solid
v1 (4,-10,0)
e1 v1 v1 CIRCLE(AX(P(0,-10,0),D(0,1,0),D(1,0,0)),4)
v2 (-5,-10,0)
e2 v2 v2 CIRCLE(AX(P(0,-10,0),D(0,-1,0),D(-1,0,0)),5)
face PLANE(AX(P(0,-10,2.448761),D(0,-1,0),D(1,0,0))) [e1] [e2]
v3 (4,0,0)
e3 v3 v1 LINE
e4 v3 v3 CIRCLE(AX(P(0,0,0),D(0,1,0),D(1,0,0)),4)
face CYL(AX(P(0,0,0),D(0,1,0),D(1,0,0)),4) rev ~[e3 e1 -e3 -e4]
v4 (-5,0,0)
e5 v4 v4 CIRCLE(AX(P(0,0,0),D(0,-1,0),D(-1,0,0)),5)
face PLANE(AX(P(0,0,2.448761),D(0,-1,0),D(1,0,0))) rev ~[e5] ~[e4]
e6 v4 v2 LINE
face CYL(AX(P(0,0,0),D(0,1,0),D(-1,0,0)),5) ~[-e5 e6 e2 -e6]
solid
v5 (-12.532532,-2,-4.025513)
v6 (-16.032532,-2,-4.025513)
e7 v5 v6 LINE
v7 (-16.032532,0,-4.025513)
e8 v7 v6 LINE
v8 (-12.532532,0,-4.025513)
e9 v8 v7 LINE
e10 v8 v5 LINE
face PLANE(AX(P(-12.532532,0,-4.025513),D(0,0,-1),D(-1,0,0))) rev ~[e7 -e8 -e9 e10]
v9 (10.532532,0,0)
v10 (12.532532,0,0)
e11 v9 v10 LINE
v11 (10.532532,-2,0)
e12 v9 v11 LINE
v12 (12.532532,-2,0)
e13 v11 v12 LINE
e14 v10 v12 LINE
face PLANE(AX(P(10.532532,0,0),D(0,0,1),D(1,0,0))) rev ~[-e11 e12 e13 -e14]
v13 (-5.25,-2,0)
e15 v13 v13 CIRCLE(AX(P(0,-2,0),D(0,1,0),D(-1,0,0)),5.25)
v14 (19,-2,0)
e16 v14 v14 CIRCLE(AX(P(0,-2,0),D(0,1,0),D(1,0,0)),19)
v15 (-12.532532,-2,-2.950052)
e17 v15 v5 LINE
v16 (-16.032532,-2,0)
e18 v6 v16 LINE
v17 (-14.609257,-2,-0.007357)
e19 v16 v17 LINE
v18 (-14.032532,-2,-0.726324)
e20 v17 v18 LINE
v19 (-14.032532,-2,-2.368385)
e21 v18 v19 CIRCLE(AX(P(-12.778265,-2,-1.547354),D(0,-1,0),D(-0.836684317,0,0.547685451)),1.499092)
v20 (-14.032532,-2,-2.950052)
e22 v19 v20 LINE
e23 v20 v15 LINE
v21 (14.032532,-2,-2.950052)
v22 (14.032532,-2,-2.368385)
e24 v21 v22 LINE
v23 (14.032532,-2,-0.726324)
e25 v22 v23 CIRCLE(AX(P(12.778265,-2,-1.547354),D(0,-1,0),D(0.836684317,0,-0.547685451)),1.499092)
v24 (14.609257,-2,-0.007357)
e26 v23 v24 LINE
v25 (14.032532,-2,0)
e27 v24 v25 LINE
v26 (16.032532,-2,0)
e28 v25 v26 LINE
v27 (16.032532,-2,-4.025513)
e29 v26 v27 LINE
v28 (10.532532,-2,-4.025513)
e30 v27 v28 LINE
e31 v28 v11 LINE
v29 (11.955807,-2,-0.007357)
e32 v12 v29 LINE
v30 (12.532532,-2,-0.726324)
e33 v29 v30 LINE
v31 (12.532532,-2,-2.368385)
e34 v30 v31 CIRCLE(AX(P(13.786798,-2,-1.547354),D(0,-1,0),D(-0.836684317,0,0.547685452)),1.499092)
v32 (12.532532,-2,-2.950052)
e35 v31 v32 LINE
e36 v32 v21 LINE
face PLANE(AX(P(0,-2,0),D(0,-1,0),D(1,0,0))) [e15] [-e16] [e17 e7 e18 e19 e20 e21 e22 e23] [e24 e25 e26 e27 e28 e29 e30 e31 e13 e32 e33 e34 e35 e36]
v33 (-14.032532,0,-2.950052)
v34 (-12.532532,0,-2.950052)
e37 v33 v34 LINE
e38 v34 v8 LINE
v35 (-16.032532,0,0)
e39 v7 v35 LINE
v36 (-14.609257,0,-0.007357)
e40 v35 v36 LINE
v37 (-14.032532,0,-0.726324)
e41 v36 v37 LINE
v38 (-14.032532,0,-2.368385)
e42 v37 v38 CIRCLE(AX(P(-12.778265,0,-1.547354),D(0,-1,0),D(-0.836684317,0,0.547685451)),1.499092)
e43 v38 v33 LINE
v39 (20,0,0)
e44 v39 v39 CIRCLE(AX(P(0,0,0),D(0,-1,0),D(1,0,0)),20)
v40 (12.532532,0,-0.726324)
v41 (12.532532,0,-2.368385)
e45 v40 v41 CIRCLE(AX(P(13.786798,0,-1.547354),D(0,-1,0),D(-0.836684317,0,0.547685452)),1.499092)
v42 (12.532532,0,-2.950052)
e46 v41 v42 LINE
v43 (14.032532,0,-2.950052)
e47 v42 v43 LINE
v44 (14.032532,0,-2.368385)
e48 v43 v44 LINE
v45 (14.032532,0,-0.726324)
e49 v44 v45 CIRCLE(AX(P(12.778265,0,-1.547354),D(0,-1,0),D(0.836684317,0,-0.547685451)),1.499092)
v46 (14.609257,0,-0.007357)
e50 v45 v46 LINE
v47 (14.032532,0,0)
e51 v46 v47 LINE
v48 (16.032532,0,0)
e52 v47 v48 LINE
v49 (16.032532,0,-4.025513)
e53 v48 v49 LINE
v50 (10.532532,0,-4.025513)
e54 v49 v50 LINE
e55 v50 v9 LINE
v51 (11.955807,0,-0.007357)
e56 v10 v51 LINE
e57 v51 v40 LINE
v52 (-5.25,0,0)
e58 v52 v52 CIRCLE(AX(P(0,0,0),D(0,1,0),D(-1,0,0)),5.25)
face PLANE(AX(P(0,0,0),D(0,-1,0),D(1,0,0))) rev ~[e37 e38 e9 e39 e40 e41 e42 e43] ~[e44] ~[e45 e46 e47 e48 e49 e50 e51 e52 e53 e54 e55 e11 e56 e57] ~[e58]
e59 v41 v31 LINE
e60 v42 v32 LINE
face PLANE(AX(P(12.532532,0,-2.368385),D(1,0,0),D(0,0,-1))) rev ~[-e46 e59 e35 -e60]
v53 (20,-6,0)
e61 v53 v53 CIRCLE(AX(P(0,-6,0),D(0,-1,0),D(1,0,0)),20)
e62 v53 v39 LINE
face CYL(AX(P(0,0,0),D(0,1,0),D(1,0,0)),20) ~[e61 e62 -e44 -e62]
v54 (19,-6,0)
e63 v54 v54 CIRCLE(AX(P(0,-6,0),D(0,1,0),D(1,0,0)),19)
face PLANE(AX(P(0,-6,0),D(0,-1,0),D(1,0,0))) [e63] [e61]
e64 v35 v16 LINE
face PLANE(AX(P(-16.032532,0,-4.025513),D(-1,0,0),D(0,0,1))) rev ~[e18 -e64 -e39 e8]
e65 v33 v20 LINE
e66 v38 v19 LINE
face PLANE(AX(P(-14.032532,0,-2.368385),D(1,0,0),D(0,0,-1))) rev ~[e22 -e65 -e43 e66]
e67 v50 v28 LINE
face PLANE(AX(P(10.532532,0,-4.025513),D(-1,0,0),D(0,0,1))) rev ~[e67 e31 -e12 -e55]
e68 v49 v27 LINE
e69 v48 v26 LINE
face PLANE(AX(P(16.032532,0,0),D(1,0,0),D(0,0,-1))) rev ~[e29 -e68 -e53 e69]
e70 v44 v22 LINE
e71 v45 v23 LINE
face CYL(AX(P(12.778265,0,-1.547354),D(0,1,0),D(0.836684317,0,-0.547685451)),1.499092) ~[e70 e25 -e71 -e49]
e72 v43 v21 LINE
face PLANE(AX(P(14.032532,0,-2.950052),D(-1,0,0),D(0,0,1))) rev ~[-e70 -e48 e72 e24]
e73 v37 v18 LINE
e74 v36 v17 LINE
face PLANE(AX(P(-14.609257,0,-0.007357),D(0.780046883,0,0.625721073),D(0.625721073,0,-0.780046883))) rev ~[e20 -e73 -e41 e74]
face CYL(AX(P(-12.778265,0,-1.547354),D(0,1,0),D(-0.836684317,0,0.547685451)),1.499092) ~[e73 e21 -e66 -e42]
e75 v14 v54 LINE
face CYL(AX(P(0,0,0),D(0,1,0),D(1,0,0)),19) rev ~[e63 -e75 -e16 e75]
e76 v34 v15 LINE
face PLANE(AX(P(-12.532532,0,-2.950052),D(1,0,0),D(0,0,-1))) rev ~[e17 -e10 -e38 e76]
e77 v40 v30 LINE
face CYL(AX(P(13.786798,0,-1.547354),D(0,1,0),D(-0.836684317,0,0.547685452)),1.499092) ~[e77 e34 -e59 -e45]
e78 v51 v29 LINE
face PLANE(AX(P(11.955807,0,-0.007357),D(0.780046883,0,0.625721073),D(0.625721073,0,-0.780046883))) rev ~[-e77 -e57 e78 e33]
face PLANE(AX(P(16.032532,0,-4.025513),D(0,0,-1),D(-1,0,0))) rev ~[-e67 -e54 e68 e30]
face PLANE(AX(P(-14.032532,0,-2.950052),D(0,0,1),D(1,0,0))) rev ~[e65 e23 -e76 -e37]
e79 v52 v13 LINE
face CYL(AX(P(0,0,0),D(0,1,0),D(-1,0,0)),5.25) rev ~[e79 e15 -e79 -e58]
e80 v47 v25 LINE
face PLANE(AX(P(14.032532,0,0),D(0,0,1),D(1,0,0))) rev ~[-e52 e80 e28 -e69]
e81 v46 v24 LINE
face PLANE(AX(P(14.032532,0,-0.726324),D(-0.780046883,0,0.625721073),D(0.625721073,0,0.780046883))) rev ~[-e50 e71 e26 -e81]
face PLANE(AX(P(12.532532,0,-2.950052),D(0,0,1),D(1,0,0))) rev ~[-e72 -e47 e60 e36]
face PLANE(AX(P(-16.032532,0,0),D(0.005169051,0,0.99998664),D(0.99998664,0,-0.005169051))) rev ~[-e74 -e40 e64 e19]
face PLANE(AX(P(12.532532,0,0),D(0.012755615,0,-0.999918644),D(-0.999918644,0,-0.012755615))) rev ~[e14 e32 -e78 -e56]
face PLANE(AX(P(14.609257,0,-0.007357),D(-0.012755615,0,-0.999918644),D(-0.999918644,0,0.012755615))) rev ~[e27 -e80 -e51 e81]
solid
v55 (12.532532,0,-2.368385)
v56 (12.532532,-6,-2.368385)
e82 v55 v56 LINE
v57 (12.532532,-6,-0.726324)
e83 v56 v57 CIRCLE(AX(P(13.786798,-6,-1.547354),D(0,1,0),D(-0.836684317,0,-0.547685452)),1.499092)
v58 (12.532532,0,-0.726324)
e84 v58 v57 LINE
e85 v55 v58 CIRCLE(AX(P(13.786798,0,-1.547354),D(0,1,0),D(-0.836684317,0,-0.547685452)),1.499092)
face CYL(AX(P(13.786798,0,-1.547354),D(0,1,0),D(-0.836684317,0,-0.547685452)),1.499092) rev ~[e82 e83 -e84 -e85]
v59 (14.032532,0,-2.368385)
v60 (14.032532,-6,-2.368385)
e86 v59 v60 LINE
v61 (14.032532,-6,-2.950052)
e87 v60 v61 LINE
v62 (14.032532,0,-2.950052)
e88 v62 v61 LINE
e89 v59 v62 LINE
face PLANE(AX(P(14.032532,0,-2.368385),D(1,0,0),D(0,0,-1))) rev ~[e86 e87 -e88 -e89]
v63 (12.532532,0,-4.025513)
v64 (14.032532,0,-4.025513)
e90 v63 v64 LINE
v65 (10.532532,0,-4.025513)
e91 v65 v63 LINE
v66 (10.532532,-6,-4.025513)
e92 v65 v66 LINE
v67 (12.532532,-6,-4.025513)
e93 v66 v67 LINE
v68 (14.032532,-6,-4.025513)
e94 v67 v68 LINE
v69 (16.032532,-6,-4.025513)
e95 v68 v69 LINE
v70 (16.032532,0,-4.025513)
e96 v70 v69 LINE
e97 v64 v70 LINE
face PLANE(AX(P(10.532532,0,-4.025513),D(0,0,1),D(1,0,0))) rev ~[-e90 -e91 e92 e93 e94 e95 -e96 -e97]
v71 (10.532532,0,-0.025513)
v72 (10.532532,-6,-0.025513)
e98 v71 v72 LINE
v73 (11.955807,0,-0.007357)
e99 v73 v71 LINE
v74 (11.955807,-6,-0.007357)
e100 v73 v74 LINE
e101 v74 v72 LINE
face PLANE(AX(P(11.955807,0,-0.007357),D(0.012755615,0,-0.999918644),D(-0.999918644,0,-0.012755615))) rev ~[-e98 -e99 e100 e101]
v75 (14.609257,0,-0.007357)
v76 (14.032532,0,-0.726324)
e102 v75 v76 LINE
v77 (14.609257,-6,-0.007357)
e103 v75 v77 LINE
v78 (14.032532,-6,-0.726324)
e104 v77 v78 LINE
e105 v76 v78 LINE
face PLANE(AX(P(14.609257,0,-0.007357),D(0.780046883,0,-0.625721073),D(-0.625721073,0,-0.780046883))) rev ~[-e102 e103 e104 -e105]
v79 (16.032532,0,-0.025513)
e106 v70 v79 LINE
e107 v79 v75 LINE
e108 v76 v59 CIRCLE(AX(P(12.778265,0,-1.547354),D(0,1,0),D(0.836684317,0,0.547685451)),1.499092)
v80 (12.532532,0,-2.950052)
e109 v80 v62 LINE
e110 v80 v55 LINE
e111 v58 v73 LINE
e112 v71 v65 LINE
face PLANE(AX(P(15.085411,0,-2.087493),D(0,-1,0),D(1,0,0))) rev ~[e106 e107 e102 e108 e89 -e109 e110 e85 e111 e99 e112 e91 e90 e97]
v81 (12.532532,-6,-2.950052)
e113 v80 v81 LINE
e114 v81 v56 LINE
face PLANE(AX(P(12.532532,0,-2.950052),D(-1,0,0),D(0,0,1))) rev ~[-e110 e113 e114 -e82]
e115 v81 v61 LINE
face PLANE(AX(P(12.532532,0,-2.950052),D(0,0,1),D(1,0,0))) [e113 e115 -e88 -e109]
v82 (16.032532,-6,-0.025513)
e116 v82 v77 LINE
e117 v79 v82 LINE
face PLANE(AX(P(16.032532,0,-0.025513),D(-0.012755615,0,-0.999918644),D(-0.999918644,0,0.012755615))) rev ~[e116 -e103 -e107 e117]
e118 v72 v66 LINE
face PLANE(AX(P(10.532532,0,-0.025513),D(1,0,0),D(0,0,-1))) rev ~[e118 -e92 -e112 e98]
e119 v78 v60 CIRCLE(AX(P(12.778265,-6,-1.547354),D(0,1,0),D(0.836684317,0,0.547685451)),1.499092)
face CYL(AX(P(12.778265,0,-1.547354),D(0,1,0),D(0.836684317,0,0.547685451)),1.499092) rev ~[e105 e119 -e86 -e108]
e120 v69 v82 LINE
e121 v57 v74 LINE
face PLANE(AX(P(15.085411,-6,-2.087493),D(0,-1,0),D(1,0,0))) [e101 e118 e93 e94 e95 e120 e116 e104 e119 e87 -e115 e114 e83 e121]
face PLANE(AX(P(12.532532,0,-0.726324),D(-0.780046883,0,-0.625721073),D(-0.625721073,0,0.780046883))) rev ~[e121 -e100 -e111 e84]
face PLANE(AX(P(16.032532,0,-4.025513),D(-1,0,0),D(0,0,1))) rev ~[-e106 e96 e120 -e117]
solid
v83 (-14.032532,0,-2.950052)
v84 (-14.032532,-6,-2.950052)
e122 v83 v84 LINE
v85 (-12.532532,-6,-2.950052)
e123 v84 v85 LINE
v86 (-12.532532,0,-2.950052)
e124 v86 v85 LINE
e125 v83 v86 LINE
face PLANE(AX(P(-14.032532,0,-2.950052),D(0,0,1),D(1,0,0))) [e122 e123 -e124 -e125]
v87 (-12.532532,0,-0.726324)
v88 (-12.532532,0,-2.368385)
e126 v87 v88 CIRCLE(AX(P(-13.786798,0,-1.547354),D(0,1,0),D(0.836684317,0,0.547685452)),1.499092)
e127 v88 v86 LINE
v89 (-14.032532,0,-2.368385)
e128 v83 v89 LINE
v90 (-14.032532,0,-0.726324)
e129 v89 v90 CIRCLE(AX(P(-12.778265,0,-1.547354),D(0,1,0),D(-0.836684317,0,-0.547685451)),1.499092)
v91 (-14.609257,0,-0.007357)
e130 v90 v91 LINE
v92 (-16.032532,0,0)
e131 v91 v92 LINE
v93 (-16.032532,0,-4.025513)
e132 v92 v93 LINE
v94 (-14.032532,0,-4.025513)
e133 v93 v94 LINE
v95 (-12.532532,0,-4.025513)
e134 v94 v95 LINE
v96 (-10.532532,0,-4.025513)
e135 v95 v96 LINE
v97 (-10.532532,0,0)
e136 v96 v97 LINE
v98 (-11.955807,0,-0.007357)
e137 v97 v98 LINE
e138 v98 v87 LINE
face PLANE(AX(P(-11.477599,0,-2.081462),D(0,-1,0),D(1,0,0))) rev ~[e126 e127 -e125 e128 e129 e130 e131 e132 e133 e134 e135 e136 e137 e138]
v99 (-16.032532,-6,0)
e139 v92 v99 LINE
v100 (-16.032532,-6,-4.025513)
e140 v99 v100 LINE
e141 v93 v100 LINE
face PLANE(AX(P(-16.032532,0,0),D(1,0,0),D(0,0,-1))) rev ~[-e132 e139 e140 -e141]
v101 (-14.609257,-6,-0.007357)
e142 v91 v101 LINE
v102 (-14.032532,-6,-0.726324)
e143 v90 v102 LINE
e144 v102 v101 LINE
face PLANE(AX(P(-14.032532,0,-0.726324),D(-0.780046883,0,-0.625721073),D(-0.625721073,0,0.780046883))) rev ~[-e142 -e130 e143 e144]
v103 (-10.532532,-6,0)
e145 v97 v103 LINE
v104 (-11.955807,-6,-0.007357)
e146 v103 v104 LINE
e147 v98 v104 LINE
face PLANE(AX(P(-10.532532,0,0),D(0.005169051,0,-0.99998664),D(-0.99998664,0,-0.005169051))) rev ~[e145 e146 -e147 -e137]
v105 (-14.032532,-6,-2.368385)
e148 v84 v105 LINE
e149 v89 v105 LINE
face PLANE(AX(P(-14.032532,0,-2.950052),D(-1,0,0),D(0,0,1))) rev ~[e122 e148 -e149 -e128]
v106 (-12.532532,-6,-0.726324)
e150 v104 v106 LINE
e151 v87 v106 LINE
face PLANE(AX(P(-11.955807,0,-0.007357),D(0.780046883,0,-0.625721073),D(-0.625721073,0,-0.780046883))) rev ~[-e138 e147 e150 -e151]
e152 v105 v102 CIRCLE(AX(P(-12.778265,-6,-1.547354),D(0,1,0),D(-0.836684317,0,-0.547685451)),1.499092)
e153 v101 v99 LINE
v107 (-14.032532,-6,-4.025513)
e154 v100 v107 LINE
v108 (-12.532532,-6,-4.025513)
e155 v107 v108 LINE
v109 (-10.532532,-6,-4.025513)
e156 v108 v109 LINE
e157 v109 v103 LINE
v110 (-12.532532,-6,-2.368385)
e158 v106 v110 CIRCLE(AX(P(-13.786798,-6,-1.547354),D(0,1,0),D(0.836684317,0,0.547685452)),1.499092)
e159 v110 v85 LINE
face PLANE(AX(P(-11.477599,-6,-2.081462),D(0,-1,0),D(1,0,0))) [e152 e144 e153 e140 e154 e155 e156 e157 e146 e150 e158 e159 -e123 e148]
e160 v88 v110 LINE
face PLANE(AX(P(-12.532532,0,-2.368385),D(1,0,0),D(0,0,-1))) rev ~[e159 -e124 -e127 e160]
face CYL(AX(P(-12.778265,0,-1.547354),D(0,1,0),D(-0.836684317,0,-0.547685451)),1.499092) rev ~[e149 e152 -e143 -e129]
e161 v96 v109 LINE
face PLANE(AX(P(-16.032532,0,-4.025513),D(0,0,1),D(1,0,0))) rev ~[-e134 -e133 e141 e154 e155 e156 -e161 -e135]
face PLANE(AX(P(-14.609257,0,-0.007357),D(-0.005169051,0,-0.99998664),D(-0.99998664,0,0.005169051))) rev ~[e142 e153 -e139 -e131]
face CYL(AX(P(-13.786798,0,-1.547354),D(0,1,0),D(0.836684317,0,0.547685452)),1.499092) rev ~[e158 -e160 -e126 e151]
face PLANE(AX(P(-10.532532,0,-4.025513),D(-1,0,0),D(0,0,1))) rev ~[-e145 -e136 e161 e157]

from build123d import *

# Parameters (mm, degrees)
F0_R     = 20
F1_DEPTH = 6
F0_W     = 1.5
F0_H     = 1.0754615068
F2_DEPTH = 2
F3_DEPTH = 10


# Not quite as in the source:
# - a feature names something its author has since deleted; it is built from what else it names


with BuildPart() as f1:
    # F0 (on Front) → F1 (new body)
    with BuildSketch(Plane.XZ):
        Circle(F0_R)
        with BuildLine():
            ThreePointArc((-19, 0), (0, 19), (19, 0))
            ThreePointArc((19, 0), (0, -19), (-19, 0))
        make_face(mode=Mode.SUBTRACT)
    extrude(amount=F1_DEPTH)

    # F0 (on Front) → F2 (join)
    with BuildSketch(Plane.XZ):
        Circle(F0_R)
        with BuildLine():
            ThreePointArc((-19, 0), (0, 19), (19, 0))
            ThreePointArc((19, 0), (0, -19), (-19, 0))
        make_face(mode=Mode.SUBTRACT)
        with BuildLine():
            Line((16.0325318575, 0), (19, 0))
            ThreePointArc((19, 0), (0, 19), (-19, 0))
            Line((-19, 0), (-16.0325318575, 0))
            Line((-16.0325318575, 0), (-14.0325318575, 0))
            Line((-14.0325318575, 0), (-12.5325318575, 0))
            Line((-12.5325318575, 0), (-10.5325318575, 0))
            Line((-10.5325318575, 0), (-7.5, 0))
            ThreePointArc((-7.5, 0), (0, 7.5), (7.5, 0))
            Line((7.5, 0), (10.5325318575, 0))
            Line((10.5325318575, 0), (12.5325318575, 0))
            Line((12.5325318575, 0), (14.0325318575, 0))
            Line((14.0325318575, 0), (16.0325318575, 0))
        make_face()
        with BuildLine():
            ThreePointArc((-19, 0), (0, -19), (19, 0))
            Line((19, 0), (16.0325318575, 0))
            Line((16.0325318575, 0), (16.0325318575, -0.0255133063))
            Line((16.0325318575, -0.0255133063), (16.0325318575, -4.0255133063))
            Line((16.0325318575, -4.0255133063), (14.0325318575, -4.0255133063))
            Line((14.0325318575, -4.0255133063), (12.5325318575, -4.0255133063))
            Line((12.5325318575, -4.0255133063), (10.5325318575, -4.0255133063))
            Line((10.5325318575, -4.0255133063), (10.5325318575, -0.0255133063))
            Line((10.5325318575, -0.0255133063), (10.5325318575, 0))
            Line((10.5325318575, 0), (7.5, 0))
            ThreePointArc((7.5, 0), (0, -7.5), (-7.5, 0))
            Line((-7.5, 0), (-10.5325318575, 0))
            Line((-10.5325318575, 0), (-10.5325318575, -4.0255133063))
            Line((-10.5325318575, -4.0255133063), (-12.5325318575, -4.0255133063))
            Line((-12.5325318575, -4.0255133063), (-14.0325318575, -4.0255133063))
            Line((-14.0325318575, -4.0255133063), (-16.0325318575, -4.0255133063))
            Line((-16.0325318575, -4.0255133063), (-16.0325318575, 0))
            Line((-16.0325318575, 0), (-19, 0))
        make_face()
        with BuildLine():
            Line((-10.5325318575, -4.0255133063), (-10.5325318575, 0))
            Line((-10.5325318575, 0), (-11.9558069244, -0.0073570799))
            Line((-11.9558069244, -0.0073570799), (-12.5325318575, -0.7263235748))
            ThreePointArc((-12.5325318575, -0.7263235748), (-12.2877066772, -1.5473542735), (-12.5325318575, -2.3683849722))
            Line((-12.5325318575, -2.3683849722), (-12.5325318575, -2.9500517994))
            Line((-12.5325318575, -2.9500517994), (-12.5325318575, -4.0255133063))
            Line((-12.5325318575, -4.0255133063), (-10.5325318575, -4.0255133063))
        make_face()
        with BuildLine():
            ThreePointArc((-7.5, 0), (0, -7.5), (7.5, 0))
            Line((7.5, 0), (5.25, 0))
            ThreePointArc((5.25, 0), (0, -5.25), (-5.25, 0))
            Line((-5.25, 0), (-7.5, 0))
        make_face()
        with BuildLine():
            Line((5.25, 0), (7.5, 0))
            ThreePointArc((7.5, 0), (0, 7.5), (-7.5, 0))
            Line((-7.5, 0), (-5.25, 0))
            ThreePointArc((-5.25, 0), (0, 5.25), (5.25, 0))
        make_face()
        with BuildLine():
            Line((-14.0325318575, 0), (-16.0325318575, 0))
            Line((-16.0325318575, 0), (-14.6092567906, -0.0073570799))
            Line((-14.6092567906, -0.0073570799), (-14.0325318575, -0.7263235748))
            ThreePointArc((-14.0325318575, -0.7263235748), (-14.2773570377, -1.5473542735), (-14.0325318575, -2.3683849722))
            Line((-14.0325318575, -2.3683849722), (-14.0325318575, -2.9500517994))
            Line((-14.0325318575, -2.9500517994), (-12.5325318575, -2.9500517994))
            Line((-12.5325318575, -2.9500517994), (-12.5325318575, -2.3683849722))
            ThreePointArc((-12.5325318575, -2.3683849722), (-12.2877066772, -1.5473542735), (-12.5325318575, -0.7263235748))
            Line((-12.5325318575, -0.7263235748), (-11.9558069244, -0.0073570799))
            Line((-11.9558069244, -0.0073570799), (-10.5325318575, 0))
            Line((-10.5325318575, 0), (-12.5325318575, 0))
            Line((-12.5325318575, 0), (-14.0325318575, 0))
        make_face()
        with BuildLine():
            Line((14.6092567906, -0.0073570799), (14.0325318575, 0))
            Line((14.0325318575, 0), (12.5325318575, 0))
            Line((12.5325318575, 0), (11.9558069244, -0.0073570799))
            Line((11.9558069244, -0.0073570799), (12.5325318575, -0.7263235748))
            ThreePointArc((12.5325318575, -0.7263235748), (12.2877066772, -1.5473542735), (12.5325318575, -2.3683849722))
            Line((12.5325318575, -2.3683849722), (12.5325318575, -2.9500517994))
            Line((12.5325318575, -2.9500517994), (14.0325318575, -2.9500517994))
            Line((14.0325318575, -2.9500517994), (14.0325318575, -2.3683849722))
            ThreePointArc((14.0325318575, -2.3683849722), (14.2773570377, -1.5473542735), (14.0325318575, -0.7263235748))
            Line((14.0325318575, -0.7263235748), (14.6092567906, -0.0073570799))
        make_face()
    extrude(amount=F2_DEPTH)


with BuildPart() as f1b:
    # F0 (on Front) → F1, piece 2 (new body)
    with BuildSketch(Plane.XZ):
        with BuildLine():
            Line((-10.5325318575, -4.0255133063), (-10.5325318575, 0))
            Line((-10.5325318575, 0), (-11.9558069244, -0.0073570799))
            Line((-11.9558069244, -0.0073570799), (-12.5325318575, -0.7263235748))
            ThreePointArc((-12.5325318575, -0.7263235748), (-12.2877066772, -1.5473542735), (-12.5325318575, -2.3683849722))
            Line((-12.5325318575, -2.3683849722), (-12.5325318575, -2.9500517994))
            Line((-12.5325318575, -2.9500517994), (-12.5325318575, -4.0255133063))
            Line((-12.5325318575, -4.0255133063), (-10.5325318575, -4.0255133063))
        make_face()
        with Locations((-13.2825318575, -3.4877825528)):
            Rectangle(F0_W, F0_H)
        with BuildLine():
            Line((-14.6092567906, -0.0073570799), (-16.0325318575, 0))
            Line((-16.0325318575, 0), (-16.0325318575, -4.0255133063))
            Line((-16.0325318575, -4.0255133063), (-14.0325318575, -4.0255133063))
            Line((-14.0325318575, -4.0255133063), (-14.0325318575, -2.9500517994))
            Line((-14.0325318575, -2.9500517994), (-14.0325318575, -2.3683849722))
            ThreePointArc((-14.0325318575, -2.3683849722), (-14.2773570377, -1.5473542735), (-14.0325318575, -0.7263235748))
            Line((-14.0325318575, -0.7263235748), (-14.6092567906, -0.0073570799))
        make_face()
    extrude(amount=F1_DEPTH)


with BuildPart() as f1c:
    # F0 (on Front) → F1, piece 3 (new body)
    with BuildSketch(Plane.XZ):
        with BuildLine():
            Line((16.0325318575, -4.0255133063), (16.0325318575, -0.0255133063))
            Line((16.0325318575, -0.0255133063), (14.6092567906, -0.0073570799))
            Line((14.6092567906, -0.0073570799), (14.0325318575, -0.7263235748))
            ThreePointArc((14.0325318575, -0.7263235748), (14.2773570377, -1.5473542735), (14.0325318575, -2.3683849722))
            Line((14.0325318575, -2.3683849722), (14.0325318575, -2.9500517994))
            Line((14.0325318575, -2.9500517994), (14.0325318575, -4.0255133063))
            Line((14.0325318575, -4.0255133063), (16.0325318575, -4.0255133063))
        make_face()
        with BuildLine():
            Line((12.5325318575, -0.7263235748), (11.9558069244, -0.0073570799))
            Line((11.9558069244, -0.0073570799), (10.5325318575, -0.0255133063))
            Line((10.5325318575, -0.0255133063), (10.5325318575, -4.0255133063))
            Line((10.5325318575, -4.0255133063), (12.5325318575, -4.0255133063))
            Line((12.5325318575, -4.0255133063), (12.5325318575, -2.9500517994))
            Line((12.5325318575, -2.9500517994), (12.5325318575, -2.3683849722))
            ThreePointArc((12.5325318575, -2.3683849722), (12.2877066772, -1.5473542735), (12.5325318575, -0.7263235748))
        make_face()
        with Locations((13.2825318575, -3.4877825528)):
            Rectangle(F0_W, F0_H)
    extrude(amount=F1_DEPTH)


with BuildPart() as f3:
    # F0 (on Front) → F3 (new body)
    with BuildSketch(Plane.XZ):
        with BuildLine():
            Line((4, 0), (5, 0))
            ThreePointArc((5, 0), (0, 5), (-5, 0))
            Line((-5, 0), (-4, 0))
            ThreePointArc((-4, 0), (0, 4), (4, 0))
        make_face()
        with BuildLine():
            ThreePointArc((-5, 0), (0, -5), (5, 0))
            Line((5, 0), (4, 0))
            ThreePointArc((4, 0), (0, -4), (-4, 0))
            Line((-4, 0), (-5, 0))
        make_face()
    extrude(amount=F3_DEPTH)


solid = Compound([f1.part, f1b.part, f1c.part, f3.part])
